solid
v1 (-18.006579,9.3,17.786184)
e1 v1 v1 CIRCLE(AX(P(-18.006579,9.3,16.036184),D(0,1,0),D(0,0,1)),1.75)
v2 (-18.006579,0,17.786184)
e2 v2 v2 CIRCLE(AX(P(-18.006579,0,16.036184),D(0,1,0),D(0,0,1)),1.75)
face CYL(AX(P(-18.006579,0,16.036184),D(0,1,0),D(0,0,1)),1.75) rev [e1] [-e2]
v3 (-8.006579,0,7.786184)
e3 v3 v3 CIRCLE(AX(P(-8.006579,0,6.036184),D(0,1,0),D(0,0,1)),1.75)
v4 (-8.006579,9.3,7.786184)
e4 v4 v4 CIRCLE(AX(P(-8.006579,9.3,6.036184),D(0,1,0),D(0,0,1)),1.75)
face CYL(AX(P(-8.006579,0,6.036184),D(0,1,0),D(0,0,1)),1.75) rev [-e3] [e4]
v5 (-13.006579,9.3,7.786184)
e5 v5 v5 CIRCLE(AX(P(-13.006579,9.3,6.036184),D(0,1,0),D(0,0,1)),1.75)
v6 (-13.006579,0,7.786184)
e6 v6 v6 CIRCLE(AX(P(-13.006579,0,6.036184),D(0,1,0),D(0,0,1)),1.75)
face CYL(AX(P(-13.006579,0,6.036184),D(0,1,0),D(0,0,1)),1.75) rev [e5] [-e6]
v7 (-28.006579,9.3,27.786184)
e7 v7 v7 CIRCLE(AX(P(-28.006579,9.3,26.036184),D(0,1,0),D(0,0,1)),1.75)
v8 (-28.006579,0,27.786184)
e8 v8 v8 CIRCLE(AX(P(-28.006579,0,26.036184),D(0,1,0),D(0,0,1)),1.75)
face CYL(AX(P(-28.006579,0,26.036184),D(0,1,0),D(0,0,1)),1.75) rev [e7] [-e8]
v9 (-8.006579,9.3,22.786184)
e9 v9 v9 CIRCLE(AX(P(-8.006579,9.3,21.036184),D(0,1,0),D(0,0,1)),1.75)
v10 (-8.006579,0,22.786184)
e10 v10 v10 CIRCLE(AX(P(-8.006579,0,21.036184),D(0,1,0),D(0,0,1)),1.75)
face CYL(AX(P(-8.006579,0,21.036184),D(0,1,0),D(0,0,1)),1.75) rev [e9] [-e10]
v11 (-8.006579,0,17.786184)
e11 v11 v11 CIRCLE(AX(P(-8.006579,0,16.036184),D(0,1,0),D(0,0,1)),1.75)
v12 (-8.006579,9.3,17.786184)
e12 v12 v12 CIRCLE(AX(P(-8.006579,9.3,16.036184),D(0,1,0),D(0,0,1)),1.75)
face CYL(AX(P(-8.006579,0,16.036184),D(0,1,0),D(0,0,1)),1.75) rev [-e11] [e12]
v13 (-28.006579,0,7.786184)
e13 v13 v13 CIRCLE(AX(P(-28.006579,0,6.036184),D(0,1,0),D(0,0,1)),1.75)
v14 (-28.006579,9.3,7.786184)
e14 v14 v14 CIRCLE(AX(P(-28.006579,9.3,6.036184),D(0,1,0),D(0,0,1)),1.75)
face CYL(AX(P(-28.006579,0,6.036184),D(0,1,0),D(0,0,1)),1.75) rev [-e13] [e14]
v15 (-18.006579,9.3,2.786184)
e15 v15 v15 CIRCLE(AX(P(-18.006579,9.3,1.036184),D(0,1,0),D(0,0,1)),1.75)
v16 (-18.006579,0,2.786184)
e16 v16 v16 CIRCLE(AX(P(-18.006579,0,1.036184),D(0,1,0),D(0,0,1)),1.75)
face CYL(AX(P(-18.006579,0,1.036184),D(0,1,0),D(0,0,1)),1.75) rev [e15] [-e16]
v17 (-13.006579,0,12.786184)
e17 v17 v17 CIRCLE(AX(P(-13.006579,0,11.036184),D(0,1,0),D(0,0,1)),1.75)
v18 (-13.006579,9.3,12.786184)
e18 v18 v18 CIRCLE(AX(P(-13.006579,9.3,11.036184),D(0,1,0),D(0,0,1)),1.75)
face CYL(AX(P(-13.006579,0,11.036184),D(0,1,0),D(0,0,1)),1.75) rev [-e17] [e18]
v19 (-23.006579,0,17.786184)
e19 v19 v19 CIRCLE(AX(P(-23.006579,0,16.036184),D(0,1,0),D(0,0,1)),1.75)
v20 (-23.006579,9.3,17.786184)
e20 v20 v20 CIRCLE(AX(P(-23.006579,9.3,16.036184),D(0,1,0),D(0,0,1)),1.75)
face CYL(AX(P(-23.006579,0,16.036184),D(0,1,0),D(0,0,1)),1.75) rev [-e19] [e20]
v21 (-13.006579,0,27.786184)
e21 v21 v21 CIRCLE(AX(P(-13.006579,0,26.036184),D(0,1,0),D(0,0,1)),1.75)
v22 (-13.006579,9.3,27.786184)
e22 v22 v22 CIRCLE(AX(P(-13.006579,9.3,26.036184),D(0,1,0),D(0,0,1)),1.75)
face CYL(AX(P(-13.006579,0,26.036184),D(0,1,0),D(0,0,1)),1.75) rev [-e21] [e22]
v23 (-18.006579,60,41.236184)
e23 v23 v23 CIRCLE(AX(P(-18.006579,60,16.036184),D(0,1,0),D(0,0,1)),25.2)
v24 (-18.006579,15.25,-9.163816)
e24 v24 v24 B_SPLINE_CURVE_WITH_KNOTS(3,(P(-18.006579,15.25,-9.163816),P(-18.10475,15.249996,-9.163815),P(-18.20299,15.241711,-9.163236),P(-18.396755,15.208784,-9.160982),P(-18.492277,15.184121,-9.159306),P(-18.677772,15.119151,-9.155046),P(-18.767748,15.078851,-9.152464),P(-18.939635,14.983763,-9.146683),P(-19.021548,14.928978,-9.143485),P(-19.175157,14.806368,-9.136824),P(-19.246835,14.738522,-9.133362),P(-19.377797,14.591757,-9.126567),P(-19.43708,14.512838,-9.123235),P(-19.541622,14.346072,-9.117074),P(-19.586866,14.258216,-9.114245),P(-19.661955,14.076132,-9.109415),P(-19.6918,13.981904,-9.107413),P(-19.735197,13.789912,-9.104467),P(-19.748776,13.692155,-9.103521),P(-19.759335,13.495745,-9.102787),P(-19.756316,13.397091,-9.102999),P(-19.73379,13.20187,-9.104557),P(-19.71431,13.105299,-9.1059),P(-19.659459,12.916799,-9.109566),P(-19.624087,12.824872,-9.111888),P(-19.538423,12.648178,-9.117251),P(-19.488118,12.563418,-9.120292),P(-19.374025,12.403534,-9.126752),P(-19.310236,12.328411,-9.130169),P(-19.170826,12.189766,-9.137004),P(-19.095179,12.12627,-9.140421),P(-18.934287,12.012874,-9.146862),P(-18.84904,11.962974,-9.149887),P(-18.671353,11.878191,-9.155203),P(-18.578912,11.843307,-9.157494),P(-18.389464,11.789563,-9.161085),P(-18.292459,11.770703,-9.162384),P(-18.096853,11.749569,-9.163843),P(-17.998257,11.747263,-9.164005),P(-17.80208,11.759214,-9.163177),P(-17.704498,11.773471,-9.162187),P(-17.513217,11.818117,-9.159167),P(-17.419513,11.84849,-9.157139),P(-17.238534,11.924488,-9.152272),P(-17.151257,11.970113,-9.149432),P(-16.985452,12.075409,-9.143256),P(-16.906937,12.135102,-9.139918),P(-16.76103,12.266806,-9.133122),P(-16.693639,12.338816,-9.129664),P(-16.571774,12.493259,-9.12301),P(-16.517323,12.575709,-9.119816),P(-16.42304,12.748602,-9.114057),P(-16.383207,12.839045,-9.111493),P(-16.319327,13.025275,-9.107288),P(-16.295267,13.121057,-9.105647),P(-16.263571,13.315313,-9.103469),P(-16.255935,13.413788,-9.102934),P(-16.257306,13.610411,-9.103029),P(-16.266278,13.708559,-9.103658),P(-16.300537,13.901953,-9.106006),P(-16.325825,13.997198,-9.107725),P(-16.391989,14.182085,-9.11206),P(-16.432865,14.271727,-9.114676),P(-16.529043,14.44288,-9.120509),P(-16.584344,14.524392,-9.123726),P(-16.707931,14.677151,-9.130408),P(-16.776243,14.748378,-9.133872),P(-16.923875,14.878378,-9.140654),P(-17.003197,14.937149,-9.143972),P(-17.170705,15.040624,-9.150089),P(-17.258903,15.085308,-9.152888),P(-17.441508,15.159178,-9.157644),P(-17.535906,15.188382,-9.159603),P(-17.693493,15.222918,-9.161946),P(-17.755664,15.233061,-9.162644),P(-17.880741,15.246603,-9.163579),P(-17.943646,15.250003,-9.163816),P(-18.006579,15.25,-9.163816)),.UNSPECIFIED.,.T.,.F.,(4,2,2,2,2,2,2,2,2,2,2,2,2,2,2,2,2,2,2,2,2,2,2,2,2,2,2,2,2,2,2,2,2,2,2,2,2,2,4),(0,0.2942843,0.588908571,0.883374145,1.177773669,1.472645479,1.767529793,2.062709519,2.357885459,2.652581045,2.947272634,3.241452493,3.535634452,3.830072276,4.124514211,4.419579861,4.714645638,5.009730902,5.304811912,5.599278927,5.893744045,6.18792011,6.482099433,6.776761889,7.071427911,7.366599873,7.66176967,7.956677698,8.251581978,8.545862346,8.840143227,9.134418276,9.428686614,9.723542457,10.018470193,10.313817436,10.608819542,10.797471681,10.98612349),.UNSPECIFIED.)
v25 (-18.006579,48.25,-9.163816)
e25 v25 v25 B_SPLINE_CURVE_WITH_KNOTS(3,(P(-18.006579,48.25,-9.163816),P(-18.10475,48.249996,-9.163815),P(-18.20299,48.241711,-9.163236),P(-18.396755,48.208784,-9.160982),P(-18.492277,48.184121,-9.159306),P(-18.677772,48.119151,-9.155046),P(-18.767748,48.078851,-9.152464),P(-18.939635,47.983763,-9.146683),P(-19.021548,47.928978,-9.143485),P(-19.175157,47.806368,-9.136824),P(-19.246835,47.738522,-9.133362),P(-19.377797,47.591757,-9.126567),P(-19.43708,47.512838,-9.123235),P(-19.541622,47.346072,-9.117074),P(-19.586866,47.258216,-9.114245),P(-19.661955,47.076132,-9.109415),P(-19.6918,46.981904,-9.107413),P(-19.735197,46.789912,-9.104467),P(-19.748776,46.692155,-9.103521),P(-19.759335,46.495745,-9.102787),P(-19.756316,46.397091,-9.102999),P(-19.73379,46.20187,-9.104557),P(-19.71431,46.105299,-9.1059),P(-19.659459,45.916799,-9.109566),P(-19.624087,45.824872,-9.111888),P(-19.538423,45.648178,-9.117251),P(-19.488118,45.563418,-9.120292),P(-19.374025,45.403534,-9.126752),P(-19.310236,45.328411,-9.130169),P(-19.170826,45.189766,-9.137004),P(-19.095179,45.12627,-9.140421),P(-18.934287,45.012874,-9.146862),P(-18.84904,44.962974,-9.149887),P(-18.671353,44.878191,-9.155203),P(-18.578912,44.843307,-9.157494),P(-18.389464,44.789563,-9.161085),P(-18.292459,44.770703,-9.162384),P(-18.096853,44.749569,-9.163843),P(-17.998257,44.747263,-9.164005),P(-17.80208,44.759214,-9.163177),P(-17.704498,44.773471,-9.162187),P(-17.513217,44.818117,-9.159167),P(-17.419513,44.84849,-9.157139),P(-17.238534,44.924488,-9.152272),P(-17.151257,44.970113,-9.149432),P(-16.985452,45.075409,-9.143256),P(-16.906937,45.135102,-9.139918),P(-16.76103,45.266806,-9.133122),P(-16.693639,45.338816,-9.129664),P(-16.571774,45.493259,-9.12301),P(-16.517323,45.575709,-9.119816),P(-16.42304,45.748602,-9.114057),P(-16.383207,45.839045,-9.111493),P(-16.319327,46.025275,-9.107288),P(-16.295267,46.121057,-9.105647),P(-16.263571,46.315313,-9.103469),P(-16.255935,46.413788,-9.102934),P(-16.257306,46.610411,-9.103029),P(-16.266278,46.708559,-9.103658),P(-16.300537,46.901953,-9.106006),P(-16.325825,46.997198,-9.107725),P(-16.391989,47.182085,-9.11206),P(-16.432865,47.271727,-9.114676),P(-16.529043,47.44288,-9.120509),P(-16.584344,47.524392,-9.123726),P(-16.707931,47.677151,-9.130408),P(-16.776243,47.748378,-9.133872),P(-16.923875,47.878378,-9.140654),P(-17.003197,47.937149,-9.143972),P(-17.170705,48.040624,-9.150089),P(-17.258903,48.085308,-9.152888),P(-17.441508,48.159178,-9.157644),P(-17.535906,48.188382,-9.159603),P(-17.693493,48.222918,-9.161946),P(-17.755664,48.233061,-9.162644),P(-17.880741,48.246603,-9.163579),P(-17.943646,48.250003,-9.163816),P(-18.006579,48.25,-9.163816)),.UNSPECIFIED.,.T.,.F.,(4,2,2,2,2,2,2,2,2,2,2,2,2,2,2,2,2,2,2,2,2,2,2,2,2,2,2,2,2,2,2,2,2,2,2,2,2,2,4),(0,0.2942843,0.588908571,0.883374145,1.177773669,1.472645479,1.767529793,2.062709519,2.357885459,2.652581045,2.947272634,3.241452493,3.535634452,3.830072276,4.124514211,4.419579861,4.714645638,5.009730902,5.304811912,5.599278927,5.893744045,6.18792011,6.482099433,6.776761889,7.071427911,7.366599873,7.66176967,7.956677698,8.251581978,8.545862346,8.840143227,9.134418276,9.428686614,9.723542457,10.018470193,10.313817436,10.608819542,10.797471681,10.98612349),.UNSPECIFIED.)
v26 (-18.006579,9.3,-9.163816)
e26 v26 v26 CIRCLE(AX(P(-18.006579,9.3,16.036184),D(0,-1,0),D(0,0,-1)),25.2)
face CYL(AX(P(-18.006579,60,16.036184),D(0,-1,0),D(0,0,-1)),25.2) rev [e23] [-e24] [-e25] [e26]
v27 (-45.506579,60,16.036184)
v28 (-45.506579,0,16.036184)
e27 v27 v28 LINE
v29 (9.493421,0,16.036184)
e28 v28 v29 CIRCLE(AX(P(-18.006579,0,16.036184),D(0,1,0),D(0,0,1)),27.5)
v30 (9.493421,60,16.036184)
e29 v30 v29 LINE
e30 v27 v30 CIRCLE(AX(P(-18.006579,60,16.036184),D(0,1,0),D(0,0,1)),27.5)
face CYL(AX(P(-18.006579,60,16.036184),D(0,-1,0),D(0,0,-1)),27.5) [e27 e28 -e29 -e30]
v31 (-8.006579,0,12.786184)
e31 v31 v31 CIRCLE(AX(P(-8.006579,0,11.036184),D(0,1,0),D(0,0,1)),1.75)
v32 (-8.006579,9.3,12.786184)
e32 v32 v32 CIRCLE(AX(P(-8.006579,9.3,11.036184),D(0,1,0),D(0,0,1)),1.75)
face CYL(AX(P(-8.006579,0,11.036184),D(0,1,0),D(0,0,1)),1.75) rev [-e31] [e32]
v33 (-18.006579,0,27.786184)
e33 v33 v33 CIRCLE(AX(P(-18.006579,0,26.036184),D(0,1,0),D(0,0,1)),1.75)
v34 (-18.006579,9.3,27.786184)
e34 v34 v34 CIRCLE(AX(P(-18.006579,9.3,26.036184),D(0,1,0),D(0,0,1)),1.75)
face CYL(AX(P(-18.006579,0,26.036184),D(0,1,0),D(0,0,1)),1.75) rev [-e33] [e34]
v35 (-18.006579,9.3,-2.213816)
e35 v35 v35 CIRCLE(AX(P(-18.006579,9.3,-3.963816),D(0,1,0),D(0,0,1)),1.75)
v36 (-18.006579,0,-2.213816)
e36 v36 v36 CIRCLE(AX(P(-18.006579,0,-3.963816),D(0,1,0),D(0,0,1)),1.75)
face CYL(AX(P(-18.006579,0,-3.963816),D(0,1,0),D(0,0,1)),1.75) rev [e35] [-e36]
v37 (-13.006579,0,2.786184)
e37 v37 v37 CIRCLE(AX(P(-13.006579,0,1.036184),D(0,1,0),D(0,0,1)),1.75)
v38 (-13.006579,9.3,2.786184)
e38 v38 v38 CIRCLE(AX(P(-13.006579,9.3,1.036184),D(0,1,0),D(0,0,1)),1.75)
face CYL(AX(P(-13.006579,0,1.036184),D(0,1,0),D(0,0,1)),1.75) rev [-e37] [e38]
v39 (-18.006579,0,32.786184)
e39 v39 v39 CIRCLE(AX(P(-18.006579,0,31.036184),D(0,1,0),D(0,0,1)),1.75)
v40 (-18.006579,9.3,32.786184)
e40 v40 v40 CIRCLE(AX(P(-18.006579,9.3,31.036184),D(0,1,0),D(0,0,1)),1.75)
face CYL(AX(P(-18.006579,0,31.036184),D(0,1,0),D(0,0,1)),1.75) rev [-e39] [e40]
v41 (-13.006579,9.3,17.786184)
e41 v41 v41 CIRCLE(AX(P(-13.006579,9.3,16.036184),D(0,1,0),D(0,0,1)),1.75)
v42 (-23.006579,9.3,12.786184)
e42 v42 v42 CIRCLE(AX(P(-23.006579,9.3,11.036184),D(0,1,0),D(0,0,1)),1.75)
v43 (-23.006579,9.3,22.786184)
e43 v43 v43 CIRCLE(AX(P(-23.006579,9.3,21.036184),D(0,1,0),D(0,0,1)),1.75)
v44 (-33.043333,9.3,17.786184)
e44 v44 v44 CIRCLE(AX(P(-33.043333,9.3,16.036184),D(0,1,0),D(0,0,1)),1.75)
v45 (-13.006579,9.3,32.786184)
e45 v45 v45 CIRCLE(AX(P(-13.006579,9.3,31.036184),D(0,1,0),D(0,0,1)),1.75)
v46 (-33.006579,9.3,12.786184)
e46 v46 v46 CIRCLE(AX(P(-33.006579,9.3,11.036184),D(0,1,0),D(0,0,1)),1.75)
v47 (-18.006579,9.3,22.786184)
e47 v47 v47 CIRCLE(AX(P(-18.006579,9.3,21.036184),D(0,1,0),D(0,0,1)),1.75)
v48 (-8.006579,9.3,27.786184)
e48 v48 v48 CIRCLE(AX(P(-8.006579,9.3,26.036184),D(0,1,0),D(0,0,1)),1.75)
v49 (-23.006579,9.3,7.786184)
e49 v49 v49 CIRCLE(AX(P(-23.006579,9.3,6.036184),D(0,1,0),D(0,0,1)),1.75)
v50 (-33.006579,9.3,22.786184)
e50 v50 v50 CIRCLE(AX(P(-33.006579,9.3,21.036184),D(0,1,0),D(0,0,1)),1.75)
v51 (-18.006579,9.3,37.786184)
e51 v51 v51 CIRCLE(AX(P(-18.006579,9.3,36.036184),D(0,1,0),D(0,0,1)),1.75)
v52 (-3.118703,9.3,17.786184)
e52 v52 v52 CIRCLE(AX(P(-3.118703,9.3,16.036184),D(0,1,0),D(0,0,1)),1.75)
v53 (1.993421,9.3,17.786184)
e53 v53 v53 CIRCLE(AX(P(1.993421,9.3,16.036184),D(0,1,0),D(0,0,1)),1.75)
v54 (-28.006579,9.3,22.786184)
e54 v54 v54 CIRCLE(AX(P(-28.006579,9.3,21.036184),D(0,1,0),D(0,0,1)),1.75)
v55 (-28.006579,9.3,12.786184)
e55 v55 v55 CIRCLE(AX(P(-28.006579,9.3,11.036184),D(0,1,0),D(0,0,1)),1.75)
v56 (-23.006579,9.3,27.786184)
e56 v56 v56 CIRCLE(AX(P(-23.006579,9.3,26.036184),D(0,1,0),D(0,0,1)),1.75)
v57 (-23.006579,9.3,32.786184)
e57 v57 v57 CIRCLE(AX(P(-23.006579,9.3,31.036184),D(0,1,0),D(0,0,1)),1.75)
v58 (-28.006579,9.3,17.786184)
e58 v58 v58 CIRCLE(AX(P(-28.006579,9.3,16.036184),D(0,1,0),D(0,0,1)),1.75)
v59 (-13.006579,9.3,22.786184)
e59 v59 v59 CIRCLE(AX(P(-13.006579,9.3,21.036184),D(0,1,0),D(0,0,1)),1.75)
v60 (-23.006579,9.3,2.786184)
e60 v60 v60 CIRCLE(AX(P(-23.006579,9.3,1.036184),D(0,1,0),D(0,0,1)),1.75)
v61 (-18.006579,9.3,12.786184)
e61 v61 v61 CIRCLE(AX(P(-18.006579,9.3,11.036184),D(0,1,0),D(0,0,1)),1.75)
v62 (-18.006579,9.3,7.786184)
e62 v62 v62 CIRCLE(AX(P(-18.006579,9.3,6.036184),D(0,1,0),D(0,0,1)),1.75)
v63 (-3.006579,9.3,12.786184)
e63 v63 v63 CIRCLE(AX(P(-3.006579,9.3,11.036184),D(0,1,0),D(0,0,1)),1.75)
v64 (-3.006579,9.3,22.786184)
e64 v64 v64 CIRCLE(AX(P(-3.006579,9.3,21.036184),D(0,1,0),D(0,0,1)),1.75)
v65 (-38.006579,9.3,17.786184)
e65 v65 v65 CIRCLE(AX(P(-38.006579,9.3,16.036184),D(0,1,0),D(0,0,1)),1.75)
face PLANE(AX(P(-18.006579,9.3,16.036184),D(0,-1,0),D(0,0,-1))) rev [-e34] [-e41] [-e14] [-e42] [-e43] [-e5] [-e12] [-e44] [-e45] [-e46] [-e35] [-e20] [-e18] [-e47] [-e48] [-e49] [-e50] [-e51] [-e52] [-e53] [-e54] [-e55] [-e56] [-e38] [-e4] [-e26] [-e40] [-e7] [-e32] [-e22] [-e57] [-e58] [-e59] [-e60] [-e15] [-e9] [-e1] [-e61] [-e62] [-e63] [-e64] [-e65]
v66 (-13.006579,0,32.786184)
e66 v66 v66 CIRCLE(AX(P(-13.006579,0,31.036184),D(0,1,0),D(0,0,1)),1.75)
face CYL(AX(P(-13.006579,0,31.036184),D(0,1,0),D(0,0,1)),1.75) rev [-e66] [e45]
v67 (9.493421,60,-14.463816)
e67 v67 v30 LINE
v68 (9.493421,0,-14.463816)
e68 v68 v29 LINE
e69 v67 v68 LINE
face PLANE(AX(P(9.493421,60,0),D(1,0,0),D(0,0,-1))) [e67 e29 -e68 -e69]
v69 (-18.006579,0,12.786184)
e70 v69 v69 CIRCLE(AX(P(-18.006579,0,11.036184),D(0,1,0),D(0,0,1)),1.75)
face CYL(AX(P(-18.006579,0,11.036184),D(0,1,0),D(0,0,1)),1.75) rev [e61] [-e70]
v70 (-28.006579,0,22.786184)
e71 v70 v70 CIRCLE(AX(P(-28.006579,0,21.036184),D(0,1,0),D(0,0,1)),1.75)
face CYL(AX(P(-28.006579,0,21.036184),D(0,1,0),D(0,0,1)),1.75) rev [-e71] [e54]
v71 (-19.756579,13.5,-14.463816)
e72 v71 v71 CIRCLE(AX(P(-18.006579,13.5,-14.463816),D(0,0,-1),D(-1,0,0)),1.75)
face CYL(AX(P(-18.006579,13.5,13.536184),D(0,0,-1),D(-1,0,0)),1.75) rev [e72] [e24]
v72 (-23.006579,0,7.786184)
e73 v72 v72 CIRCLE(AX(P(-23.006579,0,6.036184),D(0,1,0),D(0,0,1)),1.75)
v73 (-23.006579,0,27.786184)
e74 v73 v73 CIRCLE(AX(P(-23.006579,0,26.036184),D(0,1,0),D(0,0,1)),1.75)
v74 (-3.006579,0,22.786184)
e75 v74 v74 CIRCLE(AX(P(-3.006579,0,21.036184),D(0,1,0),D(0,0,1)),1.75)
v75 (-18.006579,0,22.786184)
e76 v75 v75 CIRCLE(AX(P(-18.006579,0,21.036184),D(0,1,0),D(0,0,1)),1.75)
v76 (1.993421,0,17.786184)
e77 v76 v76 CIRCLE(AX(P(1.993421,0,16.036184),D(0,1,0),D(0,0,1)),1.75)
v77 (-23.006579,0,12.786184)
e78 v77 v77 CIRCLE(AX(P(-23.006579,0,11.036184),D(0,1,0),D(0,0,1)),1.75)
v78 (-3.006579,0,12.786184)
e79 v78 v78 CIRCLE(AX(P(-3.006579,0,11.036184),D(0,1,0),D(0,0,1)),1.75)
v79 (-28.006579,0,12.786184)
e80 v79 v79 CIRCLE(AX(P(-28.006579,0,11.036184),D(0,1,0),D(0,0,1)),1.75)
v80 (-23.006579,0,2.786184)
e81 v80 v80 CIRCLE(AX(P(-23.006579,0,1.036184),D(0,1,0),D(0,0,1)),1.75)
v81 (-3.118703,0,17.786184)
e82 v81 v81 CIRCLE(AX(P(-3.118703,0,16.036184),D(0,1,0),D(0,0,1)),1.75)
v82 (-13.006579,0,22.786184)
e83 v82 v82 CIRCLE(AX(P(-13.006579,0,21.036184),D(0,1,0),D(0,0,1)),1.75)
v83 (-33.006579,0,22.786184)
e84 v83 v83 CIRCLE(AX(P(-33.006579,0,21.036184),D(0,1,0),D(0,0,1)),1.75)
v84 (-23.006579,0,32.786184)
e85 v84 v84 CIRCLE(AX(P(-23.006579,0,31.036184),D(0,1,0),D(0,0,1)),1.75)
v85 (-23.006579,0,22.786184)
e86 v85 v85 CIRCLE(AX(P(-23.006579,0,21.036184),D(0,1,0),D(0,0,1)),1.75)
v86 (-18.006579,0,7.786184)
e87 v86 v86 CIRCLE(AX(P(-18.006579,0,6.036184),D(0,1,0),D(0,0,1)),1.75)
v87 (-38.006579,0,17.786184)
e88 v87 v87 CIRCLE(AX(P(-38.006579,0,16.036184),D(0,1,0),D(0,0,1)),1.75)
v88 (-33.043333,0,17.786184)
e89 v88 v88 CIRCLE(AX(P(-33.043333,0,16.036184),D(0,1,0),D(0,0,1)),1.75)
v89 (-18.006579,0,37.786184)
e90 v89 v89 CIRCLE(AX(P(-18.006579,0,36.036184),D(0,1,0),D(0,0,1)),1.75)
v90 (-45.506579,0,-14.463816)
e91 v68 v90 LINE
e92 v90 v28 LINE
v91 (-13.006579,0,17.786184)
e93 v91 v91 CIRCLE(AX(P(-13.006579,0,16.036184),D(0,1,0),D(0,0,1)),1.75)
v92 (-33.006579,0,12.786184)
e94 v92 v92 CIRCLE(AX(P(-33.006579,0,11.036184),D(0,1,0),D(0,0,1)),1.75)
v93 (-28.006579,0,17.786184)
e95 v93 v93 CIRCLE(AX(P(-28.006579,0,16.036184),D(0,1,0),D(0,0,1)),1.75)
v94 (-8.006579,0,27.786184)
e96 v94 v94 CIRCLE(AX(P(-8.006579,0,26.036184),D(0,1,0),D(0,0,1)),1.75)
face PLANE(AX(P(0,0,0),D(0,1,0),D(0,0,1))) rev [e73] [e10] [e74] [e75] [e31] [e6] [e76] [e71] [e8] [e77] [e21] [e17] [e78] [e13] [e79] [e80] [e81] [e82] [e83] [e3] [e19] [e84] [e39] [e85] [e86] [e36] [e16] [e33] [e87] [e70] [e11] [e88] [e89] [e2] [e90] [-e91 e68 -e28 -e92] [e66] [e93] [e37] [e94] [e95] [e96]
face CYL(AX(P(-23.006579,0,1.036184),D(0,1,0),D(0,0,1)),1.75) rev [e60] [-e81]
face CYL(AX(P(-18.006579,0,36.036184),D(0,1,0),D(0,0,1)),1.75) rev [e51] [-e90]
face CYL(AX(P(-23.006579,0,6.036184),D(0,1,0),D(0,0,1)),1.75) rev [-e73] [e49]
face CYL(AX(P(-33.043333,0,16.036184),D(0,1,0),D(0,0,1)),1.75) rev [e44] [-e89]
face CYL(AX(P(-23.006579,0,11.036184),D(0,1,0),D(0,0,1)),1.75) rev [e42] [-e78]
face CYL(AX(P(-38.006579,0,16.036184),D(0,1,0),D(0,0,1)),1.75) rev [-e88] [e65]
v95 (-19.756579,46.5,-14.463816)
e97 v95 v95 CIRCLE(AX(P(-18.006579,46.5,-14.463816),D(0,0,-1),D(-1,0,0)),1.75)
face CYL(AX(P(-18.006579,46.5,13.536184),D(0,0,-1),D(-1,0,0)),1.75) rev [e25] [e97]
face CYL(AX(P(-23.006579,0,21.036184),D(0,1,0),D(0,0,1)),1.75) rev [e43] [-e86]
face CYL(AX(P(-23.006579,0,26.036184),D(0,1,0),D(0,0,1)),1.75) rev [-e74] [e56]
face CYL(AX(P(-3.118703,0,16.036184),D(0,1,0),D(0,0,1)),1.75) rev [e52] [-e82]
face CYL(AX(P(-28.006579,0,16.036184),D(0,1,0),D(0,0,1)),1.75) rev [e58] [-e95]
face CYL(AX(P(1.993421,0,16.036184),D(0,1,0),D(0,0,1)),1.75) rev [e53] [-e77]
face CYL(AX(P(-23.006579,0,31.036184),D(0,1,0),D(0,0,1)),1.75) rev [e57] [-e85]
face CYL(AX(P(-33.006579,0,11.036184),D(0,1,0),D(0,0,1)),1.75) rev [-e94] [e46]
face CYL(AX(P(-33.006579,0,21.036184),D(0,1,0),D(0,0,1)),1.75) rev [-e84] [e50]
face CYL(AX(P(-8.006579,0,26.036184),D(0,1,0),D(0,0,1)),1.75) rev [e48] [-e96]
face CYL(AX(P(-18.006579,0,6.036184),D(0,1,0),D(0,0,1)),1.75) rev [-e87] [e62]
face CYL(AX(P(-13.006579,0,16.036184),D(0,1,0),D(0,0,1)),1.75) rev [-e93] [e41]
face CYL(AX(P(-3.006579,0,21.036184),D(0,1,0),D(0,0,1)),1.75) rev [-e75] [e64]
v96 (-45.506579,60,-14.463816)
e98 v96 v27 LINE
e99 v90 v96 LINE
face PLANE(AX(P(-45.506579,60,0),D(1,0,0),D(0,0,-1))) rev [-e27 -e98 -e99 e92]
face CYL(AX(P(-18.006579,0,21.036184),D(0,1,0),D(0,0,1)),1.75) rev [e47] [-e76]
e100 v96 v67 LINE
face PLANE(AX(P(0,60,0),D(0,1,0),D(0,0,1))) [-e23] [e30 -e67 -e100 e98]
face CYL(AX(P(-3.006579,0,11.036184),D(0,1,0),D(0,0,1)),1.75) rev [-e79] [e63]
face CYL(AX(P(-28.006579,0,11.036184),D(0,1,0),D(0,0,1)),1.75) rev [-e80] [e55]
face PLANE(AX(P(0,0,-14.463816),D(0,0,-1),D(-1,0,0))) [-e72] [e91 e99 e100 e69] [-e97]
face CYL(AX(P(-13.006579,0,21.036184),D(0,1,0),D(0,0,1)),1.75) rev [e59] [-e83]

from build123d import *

# Parameters (mm, degrees)
SKETCH1_R                = 25.2
BOSS_EXTRUDE2_DEPTH      = 60
SKETCH3_R                = 25.2
BOSS_EXTRUDE3_DEPTH      = 9.3
SKETCH4_R                = 1.75
CUT_EXTRUDE1_DEPTH       = 81.850096247
MOUNTING_START           = -16.463815789
MOUNTING_HOLES_OUTLINE_R = 1.75
MOUNTING_HOLES_DEPTH     = 7.360837397
SKETCH5_W                = 55
SKETCH5_H                = 60
SKETCH5_R                = 1.75
HEIGHT_DECREASE_DEPTH    = 2


# Read off the part's stored shape, not the designer's step: mounting holes
with BuildPart() as part:
    # Sketch1 → Boss-Extrude2 (new body)
    with BuildSketch(Plane(origin=(0, 0, 0), x_dir=(1, 0, 0), z_dir=(0, 1, 0))):
        with BuildLine():
            Line((9.493421053, 16.463815789), (-45.506578947, 16.463815789))
            Line((-45.506578947, 16.463815789), (-45.506578947, -16.036184211))
            ThreePointArc((-45.506578947, -16.036184211), (-18.006578947, -43.536184211), (9.493421053, -16.036184211))
            Line((9.493421053, -16.036184211), (9.493421053, 16.463815789))
        make_face()
        with Locations(Location((-18.006578947, -16.036184211, 0), (0, 0, 270))):
            Circle(SKETCH1_R, mode=Mode.SUBTRACT)
    extrude(amount=BOSS_EXTRUDE2_DEPTH)

    # Sketch3 → Boss-Extrude3 (add)
    with BuildSketch(Plane(origin=(0, 0, 0), x_dir=(-1, 0, 0), z_dir=(0, -1, 0))):
        with Locations(Location((18.006578947, -16.036184211, 0), (0, 0, 90))):
            Circle(SKETCH3_R)
    extrude(amount=-BOSS_EXTRUDE3_DEPTH)

    # Sketch4 → Cut-Extrude1 (cut, through all)
    with BuildSketch(Plane(origin=(0, 9.3, 0), x_dir=(1, 0, 0), z_dir=(0, 1, 0))):
        with BuildLine():
            ThreePointArc((-18.006578947, 5.713815789), (-19.756578947, 3.963815789), (-18.006578947, 2.213815789))
            Line((-18.006578947, 2.213815789), (-18.006578947, 5.713815789))
        make_face()
        with BuildLine():
            Line((-18.006578947, 5.713815789), (-18.006578947, 2.213815789))
            ThreePointArc((-18.006578947, 2.213815789), (-16.76914208, 2.726378922), (-16.256578947, 3.963815789))
            ThreePointArc((-16.256578947, 3.963815789), (-16.76914208, 5.201252657), (-18.006578947, 5.713815789))
        make_face()
        with BuildLine():
            ThreePointArc((-18.006578947, -4.286184211), (-19.756578947, -6.036184211), (-18.006578947, -7.786184211))
            Line((-18.006578947, -7.786184211), (-18.006578947, -4.286184211))
        make_face()
        with BuildLine():
            Line((-18.006578947, -4.286184211), (-18.006578947, -7.786184211))
            ThreePointArc((-18.006578947, -7.786184211), (-16.76914208, -7.273621078), (-16.256578947, -6.036184211))
            ThreePointArc((-16.256578947, -6.036184211), (-16.76914208, -4.798747343), (-18.006578947, -4.286184211))
        make_face()
        with Locations(Location((-28.006578947, -6.036184211, 0), (0, 0, 270))):
            Circle(SKETCH4_R)
        with Locations(Location((-8.006578947, -6.036184211, 0), (0, 0, 270))):
            Circle(SKETCH4_R)
        with BuildLine():
            ThreePointArc((-6.256578947, -16.036184211), (-8.006578947, -14.286184211), (-9.756578947, -16.036184211))
            Line((-9.756578947, -16.036184211), (-6.256578947, -16.036184211))
        make_face()
        with BuildLine():
            Line((-6.256578947, -16.036184211), (-9.756578947, -16.036184211))
            ThreePointArc((-9.756578947, -16.036184211), (-8.006578947, -17.786184211), (-6.256578947, -16.036184211))
        make_face()
        with BuildLine():
            ThreePointArc((3.743421053, -16.036184211), (1.993421053, -14.286184211), (0.243421053, -16.036184211))
            Line((0.243421053, -16.036184211), (3.743421053, -16.036184211))
        make_face()
        with BuildLine():
            Line((3.743421053, -16.036184211), (0.243421053, -16.036184211))
            ThreePointArc((0.243421053, -16.036184211), (1.993421053, -17.786184211), (3.743421053, -16.036184211))
        make_face()
        with BuildLine():
            ThreePointArc((-19.756578947, -16.036184211), (-19.244015814, -17.273621078), (-18.006578947, -17.786184211))
            Line((-18.006578947, -17.786184211), (-18.006578947, -16.036184211))
            Line((-18.006578947, -16.036184211), (-19.756578947, -16.036184211))
        make_face()
        with BuildLine():
            Line((-18.006578947, -16.036184211), (-18.006578947, -17.786184211))
            ThreePointArc((-18.006578947, -17.786184211), (-16.76914208, -17.273621078), (-16.256578947, -16.036184211))
            Line((-16.256578947, -16.036184211), (-18.006578947, -16.036184211))
        make_face()
        with BuildLine():
            Line((-19.756578947, -16.036184211), (-18.006578947, -16.036184211))
            Line((-18.006578947, -16.036184211), (-18.006578947, -14.286184211))
            ThreePointArc((-18.006578947, -14.286184211), (-19.244015814, -14.798747343), (-19.756578947, -16.036184211))
        make_face()
        with BuildLine():
            Line((-18.006578947, -14.286184211), (-18.006578947, -16.036184211))
            Line((-18.006578947, -16.036184211), (-16.256578947, -16.036184211))
            ThreePointArc((-16.256578947, -16.036184211), (-16.76914208, -14.798747343), (-18.006578947, -14.286184211))
        make_face()
        with BuildLine():
            ThreePointArc((-39.756578947, -16.036184211), (-38.006578947, -17.786184211), (-36.256578947, -16.036184211))
            Line((-36.256578947, -16.036184211), (-39.756578947, -16.036184211))
        make_face()
        with BuildLine():
            Line((-39.756578947, -16.036184211), (-36.256578947, -16.036184211))
            ThreePointArc((-36.256578947, -16.036184211), (-38.006578947, -14.286184211), (-39.756578947, -16.036184211))
        make_face()
        with Locations(Location((-28.006578947, -26.036184211, 0), (0, 0, 270))):
            Circle(SKETCH4_R)
        with BuildLine():
            ThreePointArc((-18.006578947, -24.286184211), (-19.756578947, -26.036184211), (-18.006578947, -27.786184211))
            Line((-18.006578947, -27.786184211), (-18.006578947, -24.286184211))
        make_face()
        with BuildLine():
            Line((-18.006578947, -24.286184211), (-18.006578947, -27.786184211))
            ThreePointArc((-18.006578947, -27.786184211), (-16.76914208, -27.273621078), (-16.256578947, -26.036184211))
            ThreePointArc((-16.256578947, -26.036184211), (-16.76914208, -24.798747343), (-18.006578947, -24.286184211))
        make_face()
        with Locations(Location((-8.006578947, -26.036184211, 0), (0, 0, 270))):
            Circle(SKETCH4_R)
        with BuildLine():
            ThreePointArc((-18.006578947, -34.286184211), (-19.756578947, -36.036184211), (-18.006578947, -37.786184211))
            Line((-18.006578947, -37.786184211), (-18.006578947, -34.286184211))
        make_face()
        with BuildLine():
            Line((-18.006578947, -34.286184211), (-18.006578947, -37.786184211))
            ThreePointArc((-18.006578947, -37.786184211), (-16.76914208, -37.273621078), (-16.256578947, -36.036184211))
            ThreePointArc((-16.256578947, -36.036184211), (-16.76914208, -34.798747343), (-18.006578947, -34.286184211))
        make_face()
        with BuildLine():
            ThreePointArc((-29.756578947, -16.036184211), (-28.006578947, -17.786184211), (-26.256578947, -16.036184211))
            Line((-26.256578947, -16.036184211), (-29.756578947, -16.036184211))
        make_face()
        with BuildLine():
            Line((-29.756578947, -16.036184211), (-26.256578947, -16.036184211))
            ThreePointArc((-26.256578947, -16.036184211), (-28.006578947, -14.286184211), (-29.756578947, -16.036184211))
        make_face()
        with Locations(Location((-33.006578947, -11.036184211, 0), (0, 0, 270))):
            Circle(SKETCH4_R)
        with Locations(Location((-28.006578947, -11.036184211, 0), (0, 0, 270))):
            Circle(SKETCH4_R)
        with Locations(Location((-23.006578947, -11.036184211, 0), (0, 0, 270))):
            Circle(SKETCH4_R)
        with Locations(Location((-23.006578947, -6.036184211, 0), (0, 0, 270))):
            Circle(SKETCH4_R)
        with Locations(Location((-23.006578947, -1.036184211, 0), (0, 0, 270))):
            Circle(SKETCH4_R)
        with Locations(Location((-18.006578947, -1.036184211, 0), (0, 0, 270))):
            Circle(SKETCH4_R)
        with Locations(Location((-13.006578947, -1.036184211, 0), (0, 0, 270))):
            Circle(SKETCH4_R)
        with Locations(Location((-13.006578947, -6.036184211, 0), (0, 0, 270))):
            Circle(SKETCH4_R)
        with Locations(Location((-13.006578947, -11.036184211, 0), (0, 0, 270))):
            Circle(SKETCH4_R)
        with Locations(Location((-8.006578947, -11.036184211, 0), (0, 0, 270))):
            Circle(SKETCH4_R)
        with Locations(Location((-3.006578947, -11.036184211, 0), (0, 0, 270))):
            Circle(SKETCH4_R)
        with Locations(Location((-3.118703261, -16.036184211, 0), (0, 0, 270))):
            Circle(SKETCH4_R)
        with Locations(Location((-3.006578947, -21.036184211, 0), (0, 0, 270))):
            Circle(SKETCH4_R)
        with Locations(Location((-8.006578947, -21.036184211, 0), (0, 0, 270))):
            Circle(SKETCH4_R)
        with Locations(Location((-13.006578947, -21.036184211, 0), (0, 0, 270))):
            Circle(SKETCH4_R)
        with Locations(Location((-13.006578947, -16.036184211, 0), (0, 0, 270))):
            Circle(SKETCH4_R)
        with Locations(Location((-18.006578947, -11.036184211, 0), (0, 0, 270))):
            Circle(SKETCH4_R)
        with Locations(Location((-23.006578947, -16.036184211, 0), (0, 0, 270))):
            Circle(SKETCH4_R)
        with Locations(Location((-33.04333339, -16.036184211, 0), (0, 0, 270))):
            Circle(SKETCH4_R)
        with Locations(Location((-33.006578947, -21.036184211, 0), (0, 0, 270))):
            Circle(SKETCH4_R)
        with Locations(Location((-28.006578947, -21.036184211, 0), (0, 0, 270))):
            Circle(SKETCH4_R)
        with Locations(Location((-23.006578947, -21.036184211, 0), (0, 0, 270))):
            Circle(SKETCH4_R)
        with Locations(Location((-18.006578947, -21.036184211, 0), (0, 0, 270))):
            Circle(SKETCH4_R)
        with Locations(Location((-13.006578947, -31.036184211, 0), (0, 0, 270))):
            Circle(SKETCH4_R)
        with Locations(Location((-18.006578947, -31.036184211, 0), (0, 0, 270))):
            Circle(SKETCH4_R)
        with Locations(Location((-23.006578947, -31.036184211, 0), (0, 0, 270))):
            Circle(SKETCH4_R)
        with Locations(Location((-23.006578947, -26.036184211, 0), (0, 0, 270))):
            Circle(SKETCH4_R)
        with Locations(Location((-13.006578947, -26.036184211, 0), (0, 0, 270))):
            Circle(SKETCH4_R)
    extrude(amount=-CUT_EXTRUDE1_DEPTH, mode=Mode.SUBTRACT)

    # mounting holes outline → mounting holes (cut)
    with BuildSketch(Plane.XY.offset(MOUNTING_START)):
        with Locations((-18.006578947, 13.5)):
            Circle(MOUNTING_HOLES_OUTLINE_R)
        with Locations((-18.006578947, 46.5)):
            Circle(MOUNTING_HOLES_OUTLINE_R)
    extrude(amount=MOUNTING_HOLES_DEPTH, mode=Mode.SUBTRACT)

    # Sketch5 → height decrease (cut)
    with BuildSketch(Plane(origin=(0, 0, -16.463815789), x_dir=(-1, 0, 0), z_dir=(0, 0, -1))):
        with Locations((18.006578947, 30)):
            Rectangle(SKETCH5_W, SKETCH5_H)
        with Locations((18.006578947, 46.5)):
            Circle(SKETCH5_R, mode=Mode.SUBTRACT)
        with Locations((18.006578947, 13.5)):
            Circle(SKETCH5_R, mode=Mode.SUBTRACT)
    extrude(amount=-HEIGHT_DECREASE_DEPTH, mode=Mode.SUBTRACT)


solid = part.part
